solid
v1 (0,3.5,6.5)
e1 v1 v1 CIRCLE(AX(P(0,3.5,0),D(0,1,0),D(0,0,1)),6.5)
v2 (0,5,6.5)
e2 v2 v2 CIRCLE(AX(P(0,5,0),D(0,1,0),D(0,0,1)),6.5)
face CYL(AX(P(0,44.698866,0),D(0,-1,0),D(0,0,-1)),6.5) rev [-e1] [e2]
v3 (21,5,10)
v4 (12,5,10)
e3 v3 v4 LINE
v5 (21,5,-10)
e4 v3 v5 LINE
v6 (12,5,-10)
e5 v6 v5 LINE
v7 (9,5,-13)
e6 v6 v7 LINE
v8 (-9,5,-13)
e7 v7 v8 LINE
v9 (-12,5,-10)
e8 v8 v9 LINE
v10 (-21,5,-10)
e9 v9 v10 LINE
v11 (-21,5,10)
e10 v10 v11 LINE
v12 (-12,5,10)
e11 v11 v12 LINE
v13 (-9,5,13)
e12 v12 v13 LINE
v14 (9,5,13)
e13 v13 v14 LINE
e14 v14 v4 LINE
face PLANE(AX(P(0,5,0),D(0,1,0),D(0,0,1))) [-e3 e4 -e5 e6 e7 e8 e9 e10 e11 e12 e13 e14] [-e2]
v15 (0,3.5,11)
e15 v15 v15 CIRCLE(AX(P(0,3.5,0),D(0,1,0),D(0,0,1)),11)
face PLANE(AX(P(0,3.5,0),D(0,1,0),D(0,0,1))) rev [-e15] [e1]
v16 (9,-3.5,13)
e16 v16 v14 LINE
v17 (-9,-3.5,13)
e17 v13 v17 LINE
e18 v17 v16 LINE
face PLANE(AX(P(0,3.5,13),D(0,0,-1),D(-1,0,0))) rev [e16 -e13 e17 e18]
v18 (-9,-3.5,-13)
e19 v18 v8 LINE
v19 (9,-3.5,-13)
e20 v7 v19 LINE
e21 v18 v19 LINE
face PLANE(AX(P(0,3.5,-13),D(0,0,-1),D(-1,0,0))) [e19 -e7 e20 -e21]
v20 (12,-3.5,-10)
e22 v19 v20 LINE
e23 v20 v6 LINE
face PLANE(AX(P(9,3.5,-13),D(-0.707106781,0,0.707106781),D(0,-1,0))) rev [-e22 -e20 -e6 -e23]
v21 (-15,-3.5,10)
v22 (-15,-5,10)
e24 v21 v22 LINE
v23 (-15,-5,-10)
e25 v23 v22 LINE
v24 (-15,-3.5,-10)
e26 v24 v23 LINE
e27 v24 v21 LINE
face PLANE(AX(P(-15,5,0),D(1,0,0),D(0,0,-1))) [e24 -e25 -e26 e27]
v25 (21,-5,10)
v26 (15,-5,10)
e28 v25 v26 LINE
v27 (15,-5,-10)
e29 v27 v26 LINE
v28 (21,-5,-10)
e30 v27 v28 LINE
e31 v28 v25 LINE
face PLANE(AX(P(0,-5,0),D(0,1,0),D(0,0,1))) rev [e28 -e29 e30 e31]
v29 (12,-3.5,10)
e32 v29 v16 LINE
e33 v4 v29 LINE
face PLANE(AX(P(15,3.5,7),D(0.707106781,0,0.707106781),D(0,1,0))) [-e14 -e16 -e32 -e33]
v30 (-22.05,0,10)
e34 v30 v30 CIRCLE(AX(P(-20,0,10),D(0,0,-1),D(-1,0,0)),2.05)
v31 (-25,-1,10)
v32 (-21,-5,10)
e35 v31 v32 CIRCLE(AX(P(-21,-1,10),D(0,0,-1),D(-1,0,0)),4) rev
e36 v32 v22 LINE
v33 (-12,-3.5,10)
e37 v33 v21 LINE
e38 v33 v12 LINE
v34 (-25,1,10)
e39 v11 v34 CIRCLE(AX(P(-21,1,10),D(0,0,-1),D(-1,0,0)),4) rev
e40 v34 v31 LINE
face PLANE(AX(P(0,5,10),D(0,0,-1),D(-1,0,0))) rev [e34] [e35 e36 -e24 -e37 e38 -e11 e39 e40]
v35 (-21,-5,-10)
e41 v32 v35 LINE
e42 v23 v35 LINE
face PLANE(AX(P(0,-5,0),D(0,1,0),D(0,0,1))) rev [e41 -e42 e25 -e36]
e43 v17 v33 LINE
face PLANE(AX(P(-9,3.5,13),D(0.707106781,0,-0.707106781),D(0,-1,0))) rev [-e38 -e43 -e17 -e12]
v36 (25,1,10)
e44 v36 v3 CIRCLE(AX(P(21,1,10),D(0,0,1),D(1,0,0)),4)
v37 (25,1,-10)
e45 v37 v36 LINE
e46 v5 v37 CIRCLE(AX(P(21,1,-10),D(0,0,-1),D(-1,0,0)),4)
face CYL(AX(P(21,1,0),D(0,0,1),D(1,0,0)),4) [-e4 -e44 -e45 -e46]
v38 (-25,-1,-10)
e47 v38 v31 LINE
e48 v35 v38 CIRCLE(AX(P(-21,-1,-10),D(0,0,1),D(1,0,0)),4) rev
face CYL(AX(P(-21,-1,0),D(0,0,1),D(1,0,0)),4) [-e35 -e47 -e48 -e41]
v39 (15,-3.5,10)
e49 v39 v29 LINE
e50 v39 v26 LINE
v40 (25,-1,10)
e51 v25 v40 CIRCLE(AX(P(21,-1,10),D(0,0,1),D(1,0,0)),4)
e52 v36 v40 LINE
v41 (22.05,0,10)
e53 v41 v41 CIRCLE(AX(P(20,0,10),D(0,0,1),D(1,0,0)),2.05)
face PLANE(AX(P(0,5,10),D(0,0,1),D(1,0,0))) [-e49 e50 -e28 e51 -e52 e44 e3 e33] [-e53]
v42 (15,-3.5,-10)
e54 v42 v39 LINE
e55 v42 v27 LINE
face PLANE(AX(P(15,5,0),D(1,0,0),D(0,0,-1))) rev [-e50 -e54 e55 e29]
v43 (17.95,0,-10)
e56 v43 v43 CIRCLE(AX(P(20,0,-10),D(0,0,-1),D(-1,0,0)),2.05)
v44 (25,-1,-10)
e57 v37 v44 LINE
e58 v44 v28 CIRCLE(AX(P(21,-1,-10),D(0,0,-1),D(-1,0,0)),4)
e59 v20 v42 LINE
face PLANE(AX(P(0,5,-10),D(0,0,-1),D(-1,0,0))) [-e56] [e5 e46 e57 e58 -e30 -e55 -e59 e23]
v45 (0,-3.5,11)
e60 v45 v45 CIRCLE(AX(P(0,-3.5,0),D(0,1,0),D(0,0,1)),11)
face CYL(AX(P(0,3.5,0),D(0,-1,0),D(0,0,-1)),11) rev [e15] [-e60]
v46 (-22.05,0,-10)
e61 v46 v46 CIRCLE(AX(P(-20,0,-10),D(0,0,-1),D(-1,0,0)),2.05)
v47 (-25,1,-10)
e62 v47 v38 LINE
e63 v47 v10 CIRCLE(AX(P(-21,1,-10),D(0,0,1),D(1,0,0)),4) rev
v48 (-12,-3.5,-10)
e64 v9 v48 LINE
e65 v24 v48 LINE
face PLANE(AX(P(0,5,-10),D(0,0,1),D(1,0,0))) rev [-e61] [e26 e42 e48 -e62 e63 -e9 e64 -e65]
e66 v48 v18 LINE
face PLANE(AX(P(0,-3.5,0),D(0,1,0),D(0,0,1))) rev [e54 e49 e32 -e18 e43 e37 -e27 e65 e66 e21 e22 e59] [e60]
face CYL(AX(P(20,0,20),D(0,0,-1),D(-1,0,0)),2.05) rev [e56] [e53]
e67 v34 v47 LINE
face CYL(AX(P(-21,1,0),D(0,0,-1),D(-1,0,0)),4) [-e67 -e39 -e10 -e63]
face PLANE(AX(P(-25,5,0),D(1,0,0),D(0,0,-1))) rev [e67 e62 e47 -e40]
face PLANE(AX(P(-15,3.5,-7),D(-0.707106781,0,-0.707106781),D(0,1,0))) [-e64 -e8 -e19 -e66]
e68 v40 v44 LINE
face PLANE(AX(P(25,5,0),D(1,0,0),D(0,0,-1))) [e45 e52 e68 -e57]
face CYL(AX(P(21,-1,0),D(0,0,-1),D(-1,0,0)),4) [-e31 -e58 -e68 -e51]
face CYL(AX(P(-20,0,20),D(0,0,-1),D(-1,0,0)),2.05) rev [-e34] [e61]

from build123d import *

# Parameters (mm, degrees)
SKETCH1_W           = 30
SKETCH1_H           = 26
SKETCH1_R           = 11
BOSS_EXTRUDE1_DEPTH = 3.5
SKETCH1_3_W         = 10
SKETCH1_3_H         = 20
BOSS_EXTRUDE2_DEPTH = 5
SKETCH2_R           = 2.05
CUT_EXTRUDE1_DEPTH  = 30
FILLET1_R           = 4
CHAMFER1_SIZE       = 6
SKETCH3_R           = 6.5
BOSS_EXTRUDE3_DEPTH = 1.5


with BuildPart() as part:
    # Sketch1 → Boss-Extrude1 (new, symmetric)
    with BuildSketch(Plane(origin=(0, 0, 0), x_dir=(1, 0, 0), z_dir=(0, 1, 0))):
        Rectangle(SKETCH1_W, SKETCH1_H)
        with Locations(Location((0, 0, 0), (0, 0, 270))):
            Circle(SKETCH1_R, mode=Mode.SUBTRACT)
    extrude(amount=BOSS_EXTRUDE1_DEPTH, both=True)

    # Sketch1<3> → Boss-Extrude2 (add, symmetric)
    with BuildSketch(Plane(origin=(0, 0, 0), x_dir=(1, 0, 0), z_dir=(0, 1, 0))):
        with Locations((-20, 0)):
            Rectangle(SKETCH1_3_W, SKETCH1_3_H)
        with Locations((20, 0)):
            Rectangle(SKETCH1_3_W, SKETCH1_3_H)
    extrude(amount=BOSS_EXTRUDE2_DEPTH, both=True)

    # Sketch2 → Cut-Extrude1 (cut)
    with BuildSketch(Plane(origin=(0, 0, -10), x_dir=(-1, 0, 0), z_dir=(0, 0, -1))):
        with Locations((-20, 0)):
            Circle(SKETCH2_R)
        with Locations((20, 0)):
            Circle(SKETCH2_R)
    extrude(amount=-CUT_EXTRUDE1_DEPTH, mode=Mode.SUBTRACT)

    # Fillet1
    fillet1_edges = [part.edges().sort_by_distance(p)[0] for p in [
        (-25, -5, 0),
        (-25, 5, 0),
        (25, 5, 0),
        (25, -5, 0),
    ]]
    fillet(fillet1_edges, radius=FILLET1_R)

    # Chamfer1
    # the kernel refuses this chamfer: 6 mm, written as the material it takes off along each edge
    with BuildSketch(Plane(origin=(15, -18.930097928, -13), x_dir=(0.02749587661058649, 0, 0.9996219169112968), z_dir=(0, 1, 0))) as chamfer1_piece_1_section:
        Polygon((CHAMFER1_SIZE * 0.999621916911, -CHAMFER1_SIZE * 0.0274958766106), (-CHAMFER1_SIZE * 0.0274958766106, -CHAMFER1_SIZE * 0.999621916911), (0, 0), align=None)
    chamfer1_piece_1 = extrude(amount=37.860195856, mode=Mode.PRIVATE)
    chamfer1_piece_1 = split(chamfer1_piece_1, bisect_by=Plane(origin=(12.639593495, 0, -10), z_dir=(0, 0, -1)), keep=Keep.TOP, mode=Mode.PRIVATE)
    add(chamfer1_piece_1, mode=Mode.SUBTRACT)
    with BuildSketch(Plane(origin=(15, 18.930097928, 13), x_dir=(0.02749587661058649, 0, -0.9996219169112968), z_dir=(0, -1, 0))) as chamfer1_piece_2_section:
        Polygon((CHAMFER1_SIZE * 0.999621916911, -CHAMFER1_SIZE * 0.0274958766106), (-CHAMFER1_SIZE * 0.0274958766106, -CHAMFER1_SIZE * 0.999621916911), (0, 0), align=None)
    chamfer1_piece_2 = extrude(amount=37.860195856, mode=Mode.PRIVATE)
    chamfer1_piece_2 = split(chamfer1_piece_2, bisect_by=Plane(origin=(12.639593495, 0, 10), z_dir=(0, 0, 1)), keep=Keep.TOP, mode=Mode.PRIVATE)
    add(chamfer1_piece_2, mode=Mode.SUBTRACT)
    with BuildSketch(Plane(origin=(-15, 18.930097928, 13), x_dir=(0.9996219169112969, 0, 0.02749587661058649), z_dir=(0, -1, 0))) as chamfer1_piece_3_section:
        Polygon((CHAMFER1_SIZE * 0.999621916911, -CHAMFER1_SIZE * 0.0274958766106), (-CHAMFER1_SIZE * 0.0274958766106, -CHAMFER1_SIZE * 0.999621916911), (0, 0), align=None)
    chamfer1_piece_3 = extrude(amount=37.860195856, mode=Mode.PRIVATE)
    chamfer1_piece_3 = split(chamfer1_piece_3, bisect_by=Plane(origin=(-12.639593495, 0, 10), z_dir=(0, 0, 1)), keep=Keep.TOP, mode=Mode.PRIVATE)
    add(chamfer1_piece_3, mode=Mode.SUBTRACT)
    with BuildSketch(Plane(origin=(-15, -18.930097928, -13), x_dir=(0.9996219169112969, 0, -0.02749587661058649), z_dir=(0, 1, 0))) as chamfer1_piece_4_section:
        Polygon((CHAMFER1_SIZE * 0.999621916911, -CHAMFER1_SIZE * 0.0274958766106), (-CHAMFER1_SIZE * 0.0274958766106, -CHAMFER1_SIZE * 0.999621916911), (0, 0), align=None)
    chamfer1_piece_4 = extrude(amount=37.860195856, mode=Mode.PRIVATE)
    chamfer1_piece_4 = split(chamfer1_piece_4, bisect_by=Plane(origin=(-12.639593495, 0, -10), z_dir=(0, 0, -1)), keep=Keep.TOP, mode=Mode.PRIVATE)
    add(chamfer1_piece_4, mode=Mode.SUBTRACT)

    # Sketch3 → Boss-Extrude3 (add)
    with BuildSketch(Plane(origin=(0, 3.5, 0), x_dir=(1, 0, 0), z_dir=(0, 1, 0))):
        Polygon((15, -10), (15, 10), (12, 10), (9, 13), (-9, 13), (-12, 10), (-15, 10), (-15, -10), (-12, -10), (-9, -13), (9, -13), (12, -10), align=None)
        with Locations(Location((0, 0, 0), (0, 0, 270))):
            Circle(SKETCH3_R, mode=Mode.SUBTRACT)
    extrude(amount=BOSS_EXTRUDE3_DEPTH)


solid = part.part
